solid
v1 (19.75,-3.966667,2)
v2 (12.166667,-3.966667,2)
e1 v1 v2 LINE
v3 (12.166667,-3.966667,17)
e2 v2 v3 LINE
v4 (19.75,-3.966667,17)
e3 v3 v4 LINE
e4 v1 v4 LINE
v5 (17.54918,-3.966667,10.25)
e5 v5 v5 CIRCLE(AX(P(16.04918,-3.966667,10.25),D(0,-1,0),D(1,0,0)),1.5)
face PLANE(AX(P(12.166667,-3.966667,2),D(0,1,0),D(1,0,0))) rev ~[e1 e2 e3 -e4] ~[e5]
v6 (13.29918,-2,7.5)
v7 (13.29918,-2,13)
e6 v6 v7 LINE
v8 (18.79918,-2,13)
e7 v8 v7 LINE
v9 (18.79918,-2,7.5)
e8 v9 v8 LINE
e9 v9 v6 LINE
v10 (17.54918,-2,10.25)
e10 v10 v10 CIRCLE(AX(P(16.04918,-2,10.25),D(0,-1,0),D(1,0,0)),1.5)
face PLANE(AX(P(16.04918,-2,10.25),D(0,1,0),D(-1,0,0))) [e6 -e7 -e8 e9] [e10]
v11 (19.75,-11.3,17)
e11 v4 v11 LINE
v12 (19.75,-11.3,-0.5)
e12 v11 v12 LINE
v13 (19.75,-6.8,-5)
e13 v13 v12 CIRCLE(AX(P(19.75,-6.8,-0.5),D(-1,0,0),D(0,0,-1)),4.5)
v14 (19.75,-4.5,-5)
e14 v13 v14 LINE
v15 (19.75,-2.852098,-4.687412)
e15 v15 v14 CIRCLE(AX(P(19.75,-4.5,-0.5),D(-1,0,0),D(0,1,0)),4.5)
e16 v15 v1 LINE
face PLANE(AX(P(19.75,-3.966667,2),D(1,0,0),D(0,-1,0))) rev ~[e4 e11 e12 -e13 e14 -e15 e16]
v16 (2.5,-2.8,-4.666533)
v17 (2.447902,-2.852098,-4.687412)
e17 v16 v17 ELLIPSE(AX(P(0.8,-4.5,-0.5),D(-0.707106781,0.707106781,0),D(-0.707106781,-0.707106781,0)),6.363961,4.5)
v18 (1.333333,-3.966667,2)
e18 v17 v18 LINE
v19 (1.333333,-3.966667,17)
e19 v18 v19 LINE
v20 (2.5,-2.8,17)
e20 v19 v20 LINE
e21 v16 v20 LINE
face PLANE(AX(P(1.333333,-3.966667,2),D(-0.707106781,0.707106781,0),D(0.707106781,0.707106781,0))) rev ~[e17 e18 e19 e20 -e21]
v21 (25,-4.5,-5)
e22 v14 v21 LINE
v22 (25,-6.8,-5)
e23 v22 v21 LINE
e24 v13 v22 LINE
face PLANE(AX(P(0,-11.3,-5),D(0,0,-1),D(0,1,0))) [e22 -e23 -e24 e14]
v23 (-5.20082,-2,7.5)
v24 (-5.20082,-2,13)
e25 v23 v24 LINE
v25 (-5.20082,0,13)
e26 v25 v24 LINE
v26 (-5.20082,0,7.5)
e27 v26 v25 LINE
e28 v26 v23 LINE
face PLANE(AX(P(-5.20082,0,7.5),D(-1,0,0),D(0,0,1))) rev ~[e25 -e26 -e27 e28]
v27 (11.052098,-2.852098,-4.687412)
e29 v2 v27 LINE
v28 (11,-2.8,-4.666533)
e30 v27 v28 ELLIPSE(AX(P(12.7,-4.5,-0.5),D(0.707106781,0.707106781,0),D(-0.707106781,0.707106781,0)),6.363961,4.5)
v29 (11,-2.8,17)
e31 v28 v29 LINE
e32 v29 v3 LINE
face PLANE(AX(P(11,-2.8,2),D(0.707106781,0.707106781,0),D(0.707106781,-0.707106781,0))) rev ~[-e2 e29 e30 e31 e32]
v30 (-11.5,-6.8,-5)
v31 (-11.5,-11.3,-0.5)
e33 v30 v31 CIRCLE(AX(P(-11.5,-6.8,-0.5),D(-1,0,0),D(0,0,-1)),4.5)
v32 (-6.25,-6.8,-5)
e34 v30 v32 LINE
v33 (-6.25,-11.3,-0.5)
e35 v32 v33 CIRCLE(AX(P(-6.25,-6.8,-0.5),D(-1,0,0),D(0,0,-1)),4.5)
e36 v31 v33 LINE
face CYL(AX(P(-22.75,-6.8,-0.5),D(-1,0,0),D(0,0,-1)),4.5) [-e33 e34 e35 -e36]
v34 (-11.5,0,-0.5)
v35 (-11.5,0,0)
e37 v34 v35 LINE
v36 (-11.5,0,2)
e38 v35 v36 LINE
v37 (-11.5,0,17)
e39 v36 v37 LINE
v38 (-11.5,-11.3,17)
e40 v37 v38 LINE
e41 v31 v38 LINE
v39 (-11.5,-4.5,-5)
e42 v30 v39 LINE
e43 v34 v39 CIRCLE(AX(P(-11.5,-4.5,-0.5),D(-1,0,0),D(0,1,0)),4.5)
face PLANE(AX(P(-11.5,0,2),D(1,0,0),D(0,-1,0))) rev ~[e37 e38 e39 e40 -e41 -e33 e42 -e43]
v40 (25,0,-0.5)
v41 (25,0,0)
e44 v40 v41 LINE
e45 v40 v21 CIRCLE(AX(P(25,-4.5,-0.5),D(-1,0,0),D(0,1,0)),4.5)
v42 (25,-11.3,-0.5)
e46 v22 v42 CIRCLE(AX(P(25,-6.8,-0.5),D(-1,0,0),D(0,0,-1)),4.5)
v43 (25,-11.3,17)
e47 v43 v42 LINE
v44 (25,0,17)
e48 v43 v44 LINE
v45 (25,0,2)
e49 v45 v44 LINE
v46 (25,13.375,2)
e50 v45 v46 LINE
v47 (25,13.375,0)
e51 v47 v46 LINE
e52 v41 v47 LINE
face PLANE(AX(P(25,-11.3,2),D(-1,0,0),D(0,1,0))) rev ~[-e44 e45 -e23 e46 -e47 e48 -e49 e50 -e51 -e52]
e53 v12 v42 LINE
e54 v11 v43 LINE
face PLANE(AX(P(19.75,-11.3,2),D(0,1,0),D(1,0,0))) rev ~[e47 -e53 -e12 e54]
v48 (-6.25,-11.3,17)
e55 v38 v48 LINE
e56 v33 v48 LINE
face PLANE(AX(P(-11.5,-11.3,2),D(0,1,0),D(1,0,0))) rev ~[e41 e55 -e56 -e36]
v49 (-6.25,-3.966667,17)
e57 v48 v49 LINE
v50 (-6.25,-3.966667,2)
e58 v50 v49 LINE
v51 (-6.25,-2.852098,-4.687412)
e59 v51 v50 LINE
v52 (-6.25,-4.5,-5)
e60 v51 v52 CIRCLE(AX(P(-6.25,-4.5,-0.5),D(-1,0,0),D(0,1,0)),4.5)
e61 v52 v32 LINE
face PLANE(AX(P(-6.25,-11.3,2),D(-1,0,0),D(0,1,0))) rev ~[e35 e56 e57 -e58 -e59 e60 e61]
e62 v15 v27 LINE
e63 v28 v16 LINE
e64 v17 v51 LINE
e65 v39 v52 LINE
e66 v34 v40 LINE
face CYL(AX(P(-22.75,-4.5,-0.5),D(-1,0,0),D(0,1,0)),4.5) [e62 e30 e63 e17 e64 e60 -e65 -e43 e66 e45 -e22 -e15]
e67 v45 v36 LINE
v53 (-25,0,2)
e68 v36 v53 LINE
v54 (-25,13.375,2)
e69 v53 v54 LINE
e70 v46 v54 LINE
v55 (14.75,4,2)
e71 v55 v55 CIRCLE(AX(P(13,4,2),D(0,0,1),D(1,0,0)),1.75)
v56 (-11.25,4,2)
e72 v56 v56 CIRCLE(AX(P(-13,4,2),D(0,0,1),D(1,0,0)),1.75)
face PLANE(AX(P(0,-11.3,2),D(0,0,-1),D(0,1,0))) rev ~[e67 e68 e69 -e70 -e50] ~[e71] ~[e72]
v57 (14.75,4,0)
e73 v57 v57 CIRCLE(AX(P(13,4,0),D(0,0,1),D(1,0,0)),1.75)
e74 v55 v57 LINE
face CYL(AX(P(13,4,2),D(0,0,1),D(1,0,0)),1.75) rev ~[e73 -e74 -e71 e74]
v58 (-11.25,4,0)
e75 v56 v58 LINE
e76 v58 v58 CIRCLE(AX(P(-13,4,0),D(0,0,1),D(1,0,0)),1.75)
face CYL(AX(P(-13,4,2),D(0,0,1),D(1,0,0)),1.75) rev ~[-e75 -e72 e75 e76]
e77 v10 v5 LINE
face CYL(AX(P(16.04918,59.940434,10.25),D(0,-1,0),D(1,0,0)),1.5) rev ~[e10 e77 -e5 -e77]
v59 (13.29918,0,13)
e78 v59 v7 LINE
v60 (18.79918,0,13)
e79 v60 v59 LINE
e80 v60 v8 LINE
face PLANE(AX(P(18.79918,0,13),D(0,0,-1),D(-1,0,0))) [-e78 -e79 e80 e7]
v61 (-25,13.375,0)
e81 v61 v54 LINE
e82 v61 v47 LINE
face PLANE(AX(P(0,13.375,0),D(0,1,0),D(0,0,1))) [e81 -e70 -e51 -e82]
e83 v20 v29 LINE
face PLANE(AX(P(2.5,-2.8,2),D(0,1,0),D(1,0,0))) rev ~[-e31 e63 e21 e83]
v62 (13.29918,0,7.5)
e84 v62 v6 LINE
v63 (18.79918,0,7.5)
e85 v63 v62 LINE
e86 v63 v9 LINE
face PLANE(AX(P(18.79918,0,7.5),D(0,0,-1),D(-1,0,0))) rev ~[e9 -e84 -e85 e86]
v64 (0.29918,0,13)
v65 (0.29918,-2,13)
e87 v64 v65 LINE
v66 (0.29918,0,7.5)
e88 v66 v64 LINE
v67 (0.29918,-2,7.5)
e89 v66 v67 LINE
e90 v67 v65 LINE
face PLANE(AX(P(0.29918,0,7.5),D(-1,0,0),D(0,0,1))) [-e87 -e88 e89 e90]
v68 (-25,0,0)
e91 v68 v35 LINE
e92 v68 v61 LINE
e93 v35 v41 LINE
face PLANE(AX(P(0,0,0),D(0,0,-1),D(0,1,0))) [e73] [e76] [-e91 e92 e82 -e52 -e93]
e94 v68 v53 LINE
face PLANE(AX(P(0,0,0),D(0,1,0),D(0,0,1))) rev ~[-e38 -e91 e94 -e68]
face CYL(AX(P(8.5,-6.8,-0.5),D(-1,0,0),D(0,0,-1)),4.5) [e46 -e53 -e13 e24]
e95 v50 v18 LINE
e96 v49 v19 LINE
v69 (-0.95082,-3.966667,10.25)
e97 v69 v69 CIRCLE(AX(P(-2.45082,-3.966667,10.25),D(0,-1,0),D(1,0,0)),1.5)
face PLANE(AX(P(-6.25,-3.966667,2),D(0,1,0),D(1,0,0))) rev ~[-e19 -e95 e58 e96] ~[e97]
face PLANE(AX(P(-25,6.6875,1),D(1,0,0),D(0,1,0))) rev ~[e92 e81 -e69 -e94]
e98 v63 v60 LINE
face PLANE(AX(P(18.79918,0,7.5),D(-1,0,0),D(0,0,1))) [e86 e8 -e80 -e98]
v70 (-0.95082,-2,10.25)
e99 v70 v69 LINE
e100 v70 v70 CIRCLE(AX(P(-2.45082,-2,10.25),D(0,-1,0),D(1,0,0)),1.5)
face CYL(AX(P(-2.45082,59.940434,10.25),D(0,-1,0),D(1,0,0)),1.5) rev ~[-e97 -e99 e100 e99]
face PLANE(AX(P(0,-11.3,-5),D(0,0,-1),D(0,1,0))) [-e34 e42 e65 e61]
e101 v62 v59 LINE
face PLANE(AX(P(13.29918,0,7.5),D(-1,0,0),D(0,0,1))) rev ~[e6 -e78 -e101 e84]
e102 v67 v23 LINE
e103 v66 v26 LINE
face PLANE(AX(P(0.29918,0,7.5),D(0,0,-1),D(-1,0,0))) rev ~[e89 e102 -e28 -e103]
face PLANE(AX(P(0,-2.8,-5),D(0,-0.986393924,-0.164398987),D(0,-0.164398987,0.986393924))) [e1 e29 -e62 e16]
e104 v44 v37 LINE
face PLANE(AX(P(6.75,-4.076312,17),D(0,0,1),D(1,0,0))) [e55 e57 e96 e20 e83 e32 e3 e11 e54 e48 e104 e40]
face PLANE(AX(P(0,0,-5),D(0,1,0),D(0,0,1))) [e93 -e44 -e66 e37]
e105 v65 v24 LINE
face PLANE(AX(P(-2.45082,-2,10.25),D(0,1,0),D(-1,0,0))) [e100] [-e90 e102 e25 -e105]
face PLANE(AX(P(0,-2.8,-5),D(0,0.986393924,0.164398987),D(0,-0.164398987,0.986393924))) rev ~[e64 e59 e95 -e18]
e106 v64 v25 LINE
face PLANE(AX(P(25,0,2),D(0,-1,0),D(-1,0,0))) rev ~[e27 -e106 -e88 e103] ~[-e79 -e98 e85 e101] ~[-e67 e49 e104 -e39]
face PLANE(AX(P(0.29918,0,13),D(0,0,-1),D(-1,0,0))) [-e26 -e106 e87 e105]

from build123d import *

# Parameters (mm, degrees)
F0_W           = 13.375
F0_H           = 2
F1_DEPTH       = 25
F2_R           = 1.75
F3_DEPTH       = 2
F4_W           = 11.3
F4_H           = 7
F5_DEPTH       = 25
F5_DEPTH_BACK  = 11.5
F6_W           = 26
F6_H           = 6.5
F7_DEPTH       = 7
F9_DEPTH       = 7
F11_DEPTH      = 19.75
F11_DEPTH_BACK = 6.25
F12_T1_DEPTH   = 27.75
F12_T3_DEPTH   = 27.75
F12_T5_DEPTH   = 59
F14_DEPTH      = 15
F15_W          = 5.5
F15_H          = 5.5
F16_DEPTH      = 2
F17_DEPTH      = 2
F18_D          = 3


# Not quite as in the source:
# - a fillet or chamfer that OpenCascade refuses, or shapes differently, is made with other operations: its cross-section is extruded or revolved along the edge and cut away or added


with BuildPart() as f1:
    # F0 (on Right) → F1 (new body, symmetric)
    with BuildSketch(Plane.YZ):
        with Locations((6.6875, 1)):
            Rectangle(F0_W, F0_H)
    extrude(amount=F1_DEPTH, both=True)

    # F2 (on face) → F3 (cut, through all)
    with BuildSketch(Plane.XY.offset(2)):
        with Locations((-13, 4)):
            Circle(F2_R)
        with Locations((13, 4)):
            Circle(F2_R)
    extrude(amount=-F3_DEPTH, mode=Mode.SUBTRACT)

    # F4 (on Right) → F5 (join, two sides)
    with BuildSketch(Plane.YZ) as f5_sk:
        with Locations((-5.65, -1.5)):
            Rectangle(F4_W, F4_H)
    extrude(amount=F5_DEPTH)
    extrude(f5_sk.sketch, amount=-F5_DEPTH_BACK)

    # F6 (on face) → F7 (cut, through all)
    with BuildSketch(Plane(origin=(0, 0, -5), x_dir=(1, 0, 0), z_dir=(0, 0, -1))):
        with Locations((6.75, 8.05)):
            Rectangle(F6_W, F6_H)
    extrude(amount=-F7_DEPTH, mode=Mode.SUBTRACT)

    # F8 (on face) → F9 (cut, through all)
    with BuildSketch(Plane(origin=(0, 0, -5), x_dir=(1, 0, 0), z_dir=(0, 0, -1))):
        Polygon((13, 4.8), (0.5, 4.8), (2.5, 2.8), (11, 2.8), align=None)
    extrude(amount=-F9_DEPTH, mode=Mode.SUBTRACT)

    # F10 (on Right) → F11 (cut, two sides)
    with BuildSketch(Plane.YZ) as f11_sk:
        Polygon((-4.8, -5), (-2.8, -5), (-4.8, 7), align=None)
    extrude(amount=F11_DEPTH, mode=Mode.SUBTRACT)
    extrude(f11_sk.sketch, amount=-F11_DEPTH_BACK, mode=Mode.SUBTRACT)

    # F12: fillet of radius 4.5 on 3 edges, made by hand

    # F12_s2 → F12_t1 (cut)
    with BuildSketch(Plane.YZ.offset(-22.75)):
        with BuildLine():
            ThreePointArc((-6.8, -5), (-9.9819805153, -3.6819805153), (-11.3, -0.5))
            Line((-11.3, -0.5), (-11.3, -5))
            Line((-11.3, -5), (-6.8, -5))
        make_face()
    extrude(amount=F12_T1_DEPTH, mode=Mode.SUBTRACT)

    # F12_s4 → F12_t3 (cut)
    with BuildSketch(Plane.YZ.offset(8.5)):
        with BuildLine():
            ThreePointArc((-6.8, -5), (-9.9819805153, -3.6819805153), (-11.3, -0.5))
            Line((-11.3, -0.5), (-11.3, -5))
            Line((-11.3, -5), (-6.8, -5))
        make_face()
    extrude(amount=F12_T3_DEPTH, mode=Mode.SUBTRACT)

    # F12_s6 → F12_t5 (cut)
    with BuildSketch(Plane.YZ.offset(-22.75)):
        with BuildLine():
            ThreePointArc((0, -0.5), (-1.3180194847, -3.6819805153), (-4.5, -5))
            Line((-4.5, -5), (0, -5))
            Line((0, -5), (0, -0.5))
        make_face()
    extrude(amount=F12_T5_DEPTH, mode=Mode.SUBTRACT)

    # F13 (on face) → F14 (join)
    with BuildSketch(Plane.XY.offset(2)):
        Polygon((25, 0), (-11.5, 0), (-11.5, -11.3), (-6.25, -11.3), (-6.25, -3.9666666667), (1.3333333333, -3.9666666667), (2.5, -2.8), (11, -2.8), (12.1666666667, -3.9666666667), (19.75, -3.9666666667), (19.75, -11.3), (25, -11.3), align=None)
    extrude(amount=F14_DEPTH)

    # F15 (on face) → F16 (join)
    with BuildSketch(Plane(origin=(0, 0, 0), x_dir=(-1, 0, 0), z_dir=(0, 1, 0))):
        with Locations((-16.04918, 10.25)):
            Rectangle(F15_W, F15_H)
        with Locations((2.45082, 10.25)):
            Rectangle(F15_W, F15_H)
    extrude(amount=-F16_DEPTH)

    # F15 (on face) → F17 (cut)
    with BuildSketch(Plane(origin=(0, 0, 0), x_dir=(-1, 0, 0), z_dir=(0, 1, 0))):
        with Locations((-16.04918, 10.25)):
            Rectangle(F15_W, F15_H)
        with Locations((2.45082, 10.25)):
            Rectangle(F15_W, F15_H)
    extrude(amount=-F17_DEPTH, mode=Mode.SUBTRACT)

    # F18 (through all)
    with Locations(Plane(origin=(0, 0, 0), x_dir=(-1, 0, 0), z_dir=(0, 1, 0))):
        with Locations((2.45082, 10.25), (-16.04918, 10.25)):
            Hole(F18_D / 2)


solid = f1.part
